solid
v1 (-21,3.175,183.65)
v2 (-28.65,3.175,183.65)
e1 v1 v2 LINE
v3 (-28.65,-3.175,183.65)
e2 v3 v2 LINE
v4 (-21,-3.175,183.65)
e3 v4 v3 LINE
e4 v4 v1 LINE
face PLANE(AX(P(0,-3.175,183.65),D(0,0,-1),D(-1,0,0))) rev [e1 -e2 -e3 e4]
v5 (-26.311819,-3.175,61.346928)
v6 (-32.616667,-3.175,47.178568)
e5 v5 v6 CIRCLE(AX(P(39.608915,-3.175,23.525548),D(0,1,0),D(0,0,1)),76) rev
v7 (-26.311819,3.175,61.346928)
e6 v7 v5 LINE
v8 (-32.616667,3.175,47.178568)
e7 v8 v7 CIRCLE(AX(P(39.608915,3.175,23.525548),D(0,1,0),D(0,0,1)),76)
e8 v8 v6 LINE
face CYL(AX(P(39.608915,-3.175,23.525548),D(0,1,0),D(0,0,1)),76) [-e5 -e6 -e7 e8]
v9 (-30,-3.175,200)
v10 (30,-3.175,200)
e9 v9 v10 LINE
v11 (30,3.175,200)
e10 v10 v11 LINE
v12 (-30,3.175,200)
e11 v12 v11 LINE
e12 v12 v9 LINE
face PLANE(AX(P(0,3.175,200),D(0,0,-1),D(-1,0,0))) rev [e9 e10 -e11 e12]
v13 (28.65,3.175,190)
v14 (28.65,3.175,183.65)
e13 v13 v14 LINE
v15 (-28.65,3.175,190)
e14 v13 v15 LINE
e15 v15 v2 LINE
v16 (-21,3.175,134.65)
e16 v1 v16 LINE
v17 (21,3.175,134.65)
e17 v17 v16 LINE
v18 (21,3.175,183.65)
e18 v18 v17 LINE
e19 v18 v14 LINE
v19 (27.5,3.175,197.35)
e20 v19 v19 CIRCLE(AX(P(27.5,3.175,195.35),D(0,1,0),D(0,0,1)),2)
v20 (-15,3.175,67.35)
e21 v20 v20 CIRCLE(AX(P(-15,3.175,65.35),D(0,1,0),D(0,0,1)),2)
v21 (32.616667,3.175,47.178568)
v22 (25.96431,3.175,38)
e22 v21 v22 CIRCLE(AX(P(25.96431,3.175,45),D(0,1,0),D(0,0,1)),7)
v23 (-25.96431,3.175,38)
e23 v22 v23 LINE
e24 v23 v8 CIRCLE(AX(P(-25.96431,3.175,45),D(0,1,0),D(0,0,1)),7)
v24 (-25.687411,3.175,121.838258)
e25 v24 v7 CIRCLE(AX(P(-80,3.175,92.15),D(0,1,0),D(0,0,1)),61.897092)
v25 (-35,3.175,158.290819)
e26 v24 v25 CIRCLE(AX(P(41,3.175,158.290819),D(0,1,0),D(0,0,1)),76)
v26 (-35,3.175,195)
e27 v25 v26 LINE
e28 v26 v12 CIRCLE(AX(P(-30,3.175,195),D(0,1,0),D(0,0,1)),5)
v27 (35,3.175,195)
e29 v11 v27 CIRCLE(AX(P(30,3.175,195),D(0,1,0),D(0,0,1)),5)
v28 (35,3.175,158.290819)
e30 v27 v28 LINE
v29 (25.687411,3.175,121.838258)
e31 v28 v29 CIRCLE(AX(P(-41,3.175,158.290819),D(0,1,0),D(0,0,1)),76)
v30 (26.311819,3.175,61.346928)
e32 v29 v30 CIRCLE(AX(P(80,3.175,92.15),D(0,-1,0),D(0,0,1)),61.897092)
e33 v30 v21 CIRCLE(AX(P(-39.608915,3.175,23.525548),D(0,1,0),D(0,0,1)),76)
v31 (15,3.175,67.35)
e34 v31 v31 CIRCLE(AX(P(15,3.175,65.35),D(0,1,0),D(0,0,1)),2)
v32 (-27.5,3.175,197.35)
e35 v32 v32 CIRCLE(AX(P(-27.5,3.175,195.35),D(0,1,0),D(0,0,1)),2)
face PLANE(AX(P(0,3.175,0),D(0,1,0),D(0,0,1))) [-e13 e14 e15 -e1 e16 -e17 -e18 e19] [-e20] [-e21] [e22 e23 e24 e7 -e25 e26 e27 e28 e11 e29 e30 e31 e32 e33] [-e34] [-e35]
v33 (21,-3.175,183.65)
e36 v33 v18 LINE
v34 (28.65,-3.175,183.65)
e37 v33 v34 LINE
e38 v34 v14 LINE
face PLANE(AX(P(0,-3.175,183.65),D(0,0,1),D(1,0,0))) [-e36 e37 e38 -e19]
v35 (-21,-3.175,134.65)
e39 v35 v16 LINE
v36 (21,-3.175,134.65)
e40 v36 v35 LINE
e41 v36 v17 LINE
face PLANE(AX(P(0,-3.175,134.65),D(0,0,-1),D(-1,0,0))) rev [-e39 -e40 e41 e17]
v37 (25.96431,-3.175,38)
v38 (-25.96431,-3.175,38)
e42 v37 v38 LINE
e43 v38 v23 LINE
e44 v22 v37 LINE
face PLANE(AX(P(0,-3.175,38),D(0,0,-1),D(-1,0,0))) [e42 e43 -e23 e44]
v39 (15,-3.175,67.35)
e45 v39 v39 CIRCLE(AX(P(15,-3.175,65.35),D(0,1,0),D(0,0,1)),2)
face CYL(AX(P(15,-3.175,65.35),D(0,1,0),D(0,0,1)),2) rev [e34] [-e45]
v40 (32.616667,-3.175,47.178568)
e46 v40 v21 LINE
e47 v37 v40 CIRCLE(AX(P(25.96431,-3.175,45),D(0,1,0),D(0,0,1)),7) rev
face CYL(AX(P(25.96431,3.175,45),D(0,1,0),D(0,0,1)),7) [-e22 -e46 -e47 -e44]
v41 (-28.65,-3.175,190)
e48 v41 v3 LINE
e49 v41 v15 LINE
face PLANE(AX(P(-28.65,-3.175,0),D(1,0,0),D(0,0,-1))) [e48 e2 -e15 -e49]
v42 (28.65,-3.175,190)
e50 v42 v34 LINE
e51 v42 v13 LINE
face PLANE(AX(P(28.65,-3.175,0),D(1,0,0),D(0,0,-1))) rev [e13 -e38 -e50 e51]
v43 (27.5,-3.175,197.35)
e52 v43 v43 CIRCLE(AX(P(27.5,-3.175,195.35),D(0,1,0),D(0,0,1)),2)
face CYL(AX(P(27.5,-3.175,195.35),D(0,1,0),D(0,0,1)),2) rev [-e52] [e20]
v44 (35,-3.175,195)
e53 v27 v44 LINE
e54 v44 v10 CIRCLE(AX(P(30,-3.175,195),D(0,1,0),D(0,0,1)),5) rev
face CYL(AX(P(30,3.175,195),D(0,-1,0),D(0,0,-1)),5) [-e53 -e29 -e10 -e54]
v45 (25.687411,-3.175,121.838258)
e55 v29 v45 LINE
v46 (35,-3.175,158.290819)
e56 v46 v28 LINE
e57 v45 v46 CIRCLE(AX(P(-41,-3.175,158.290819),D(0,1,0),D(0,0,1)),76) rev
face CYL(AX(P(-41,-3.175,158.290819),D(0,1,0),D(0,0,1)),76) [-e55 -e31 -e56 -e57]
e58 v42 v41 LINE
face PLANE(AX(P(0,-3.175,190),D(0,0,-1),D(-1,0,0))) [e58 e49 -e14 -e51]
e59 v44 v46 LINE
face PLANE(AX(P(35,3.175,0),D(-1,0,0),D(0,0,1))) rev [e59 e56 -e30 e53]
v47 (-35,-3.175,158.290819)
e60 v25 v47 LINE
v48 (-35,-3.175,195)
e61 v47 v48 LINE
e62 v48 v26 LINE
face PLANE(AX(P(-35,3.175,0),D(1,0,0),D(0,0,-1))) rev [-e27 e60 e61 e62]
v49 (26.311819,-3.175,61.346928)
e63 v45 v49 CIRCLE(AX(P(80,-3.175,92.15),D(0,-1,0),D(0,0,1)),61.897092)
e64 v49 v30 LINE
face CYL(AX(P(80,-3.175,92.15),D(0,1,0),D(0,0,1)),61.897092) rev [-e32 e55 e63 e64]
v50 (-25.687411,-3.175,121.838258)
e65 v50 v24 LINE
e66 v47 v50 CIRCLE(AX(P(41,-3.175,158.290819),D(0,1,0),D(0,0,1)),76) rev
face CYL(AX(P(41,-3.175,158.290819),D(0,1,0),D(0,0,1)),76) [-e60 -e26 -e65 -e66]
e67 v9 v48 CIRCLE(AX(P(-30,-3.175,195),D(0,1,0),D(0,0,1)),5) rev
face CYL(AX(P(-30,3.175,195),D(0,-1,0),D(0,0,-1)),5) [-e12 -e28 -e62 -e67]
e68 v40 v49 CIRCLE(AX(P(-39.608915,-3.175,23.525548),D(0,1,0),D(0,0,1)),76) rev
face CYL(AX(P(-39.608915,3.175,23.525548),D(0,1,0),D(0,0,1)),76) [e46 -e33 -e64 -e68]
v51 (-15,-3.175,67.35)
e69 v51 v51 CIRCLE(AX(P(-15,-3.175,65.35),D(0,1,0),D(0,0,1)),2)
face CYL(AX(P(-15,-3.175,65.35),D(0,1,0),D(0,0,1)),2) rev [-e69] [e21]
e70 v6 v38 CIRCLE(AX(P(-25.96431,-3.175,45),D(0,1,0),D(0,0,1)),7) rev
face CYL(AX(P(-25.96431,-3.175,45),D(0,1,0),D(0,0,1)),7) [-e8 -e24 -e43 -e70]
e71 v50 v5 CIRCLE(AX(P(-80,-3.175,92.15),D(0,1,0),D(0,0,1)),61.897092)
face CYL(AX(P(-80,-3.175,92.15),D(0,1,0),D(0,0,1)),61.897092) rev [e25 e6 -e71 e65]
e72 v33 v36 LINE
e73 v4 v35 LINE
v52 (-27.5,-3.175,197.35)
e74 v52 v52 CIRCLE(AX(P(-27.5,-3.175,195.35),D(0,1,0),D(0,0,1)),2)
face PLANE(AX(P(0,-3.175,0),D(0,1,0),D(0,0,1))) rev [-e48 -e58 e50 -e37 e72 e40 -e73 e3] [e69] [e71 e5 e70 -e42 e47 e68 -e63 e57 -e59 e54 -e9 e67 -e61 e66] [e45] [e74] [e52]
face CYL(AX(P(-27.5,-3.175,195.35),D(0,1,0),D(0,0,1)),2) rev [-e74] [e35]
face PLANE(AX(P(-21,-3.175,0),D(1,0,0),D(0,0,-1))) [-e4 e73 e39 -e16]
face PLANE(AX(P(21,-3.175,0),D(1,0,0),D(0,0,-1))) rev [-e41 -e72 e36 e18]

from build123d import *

# Parameters (mm, degrees)
BOSS_EXTRUDE1_DEPTH = 3.175
CUT_EXTRUDE1_DEPTH  = 204.138678001
SKETCH3_W           = 42
SKETCH3_H           = 55.35
SKETCH3_W_2         = 7.65
SKETCH3_H_2         = 6.35
CUT_EXTRUDE2_DEPTH  = 204.138678001
FILLET3_R           = 5
SKETCH5_R           = 2
CUT_EXTRUDE4_DEPTH  = 204.138678001
CUT_EXTRUDE5_DEPTH  = 204.138678001
FILLET5_R           = 76
FILLET6_R           = 7


with BuildPart() as part:
    # Sketch1 → Boss-Extrude1 (new, symmetric)
    with BuildSketch(Plane(origin=(0, 0, 0), x_dir=(1, 0, 0), z_dir=(0, 1, 0))):
        with BuildLine():
            Line((35, -200), (35, 0))
            ThreePointArc((35, 0), (0, 35), (-35, 0))
            Line((-35, 0), (-35, -200))
            Line((-35, -200), (35, -200))
        make_face()
    extrude(amount=BOSS_EXTRUDE1_DEPTH, both=True)

    # Sketch2 → Cut-Extrude1 (cut, through all)
    with BuildSketch(Plane(origin=(0, 3.175, 0), x_dir=(1, 0, 0), z_dir=(0, 1, 0))):
        with BuildLine():
            Line((-35, -38), (35, -38))
            Line((35, -38), (35, 0))
            ThreePointArc((35, 0), (0, 35), (-35, 0))
            Line((-35, 0), (-35, -38))
        make_face()
    extrude(amount=-CUT_EXTRUDE1_DEPTH, mode=Mode.SUBTRACT)

    # Sketch3 → Cut-Extrude2 (cut, through all)
    with BuildSketch(Plane(origin=(0, 3.175, 0), x_dir=(1, 0, 0), z_dir=(0, 1, 0))):
        with Locations((0, -162.325)):
            Rectangle(SKETCH3_W, SKETCH3_H)
        with Locations((-24.825, -186.825)):
            Rectangle(SKETCH3_W_2, SKETCH3_H_2)
        with Locations((24.825, -186.825)):
            Rectangle(SKETCH3_W_2, SKETCH3_H_2)
    extrude(amount=-CUT_EXTRUDE2_DEPTH, mode=Mode.SUBTRACT)

    # Fillet3
    fillet3_edges = [part.edges().sort_by_distance(p)[0] for p in [
        (35, 0, 200),
        (-35, 0, 200),
    ]]
    fillet(fillet3_edges, radius=FILLET3_R)

    # Sketch5 → Cut-Extrude4 (cut, through all)
    with BuildSketch(Plane(origin=(0, 3.175, 0), x_dir=(1, 0, 0), z_dir=(0, 1, 0))):
        with Locations(Location((27.5, -195.35, 0), (0, 0, 270))):
            Circle(SKETCH5_R)
        with Locations(Location((-27.5, -195.35, 0), (0, 0, 270))):
            Circle(SKETCH5_R)
        with Locations(Location((15, -65.35, 0), (0, 0, 270))):
            Circle(SKETCH5_R)
        with Locations(Location((-15, -65.35, 0), (0, 0, 270))):
            Circle(SKETCH5_R)
    extrude(amount=-CUT_EXTRUDE4_DEPTH, mode=Mode.SUBTRACT)

    # Sketch6 → Cut-Extrude5 (cut, through all)
    with BuildSketch(Plane(origin=(0, 3.175, 0), x_dir=(1, 0, 0), z_dir=(0, 1, 0))):
        with BuildLine():
            Line((-35, -134.65), (-35, -49.65))
            ThreePointArc((-35, -49.65), (-18.102907984, -92.15), (-35, -134.65))
        make_face()
    cut_extrude5 = extrude(amount=-CUT_EXTRUDE5_DEPTH, mode=Mode.SUBTRACT)

    # Mirror1: Cut-Extrude5 across plane
    add(cut_extrude5.mirror(Plane(origin=(0, 0, 0), x_dir=(0, 0, 1), z_dir=(1, 0, 0))), mode=Mode.SUBTRACT)

    # Fillet5
    # the kernel refuses this fillet: 76 mm, written as the material it takes off along each edge
    with BuildSketch(Plane(origin=(-35, 39.601520625, 49.65), x_dir=(0, 0, -1), z_dir=(0, -1, 0))) as fillet5_piece_1:
        with BuildLine():
            CenterArc((26.124451555, 74.608915367), FILLET5_R, 240.155370723, 18.865389254)
            Line((-11.696928446, 8.688181035), (-12.453356046, 7.369766348))
            ThreePointArc((-12.453356046, 7.369766348), (-6.498269887, 3.469254885), (-1.04366777, -1.105059992))
            Line((-1.04366777, -1.105059992), (0, -1.52))
            ThreePointArc((0, -1.52), (5.825, -1.52), (11.360510969, -1.492178307))
            Line((11.360510969, -1.492178307), (11.65, 0))
        make_face()
    extrude(amount=79.20304125, mode=Mode.SUBTRACT)
    with BuildSketch(Plane(origin=(-35, 62.277048415, 134.65), x_dir=(0.587963491001448, 0, -0.8088874663693276), z_dir=(0, -1, 0))) as fillet5_piece_2:
        with BuildLine():
            CenterArc((25.562462836, 75.375386129), FILLET5_R, 233.987375861, 28.66182532)
            Line((-19.12276248, 13.899938684), (-20.016466986, 12.670429736))
            Line((-20.016466986, 12.670429736), (-0.893704506, -1.229508949))
            Line((-0.893704506, -1.229508949), (0.194474848, -1.507507723))
            ThreePointArc((0.194474848, -1.507507723), (7.919360226, -1.011292338), (15.644245604, -1.507507723))
            Line((15.644245604, -1.507507723), (15.838720451, 0))
        make_face()
    extrude(amount=124.554096829, mode=Mode.SUBTRACT)
    with BuildSketch(Plane(origin=(35, 62.277048415, 134.65), x_dir=(-0.587963491001448, 0, -0.8088874663693276), z_dir=(0, -1, 0))) as fillet5_piece_3:
        with BuildLine():
            CenterArc((25.562462836, -75.375386129), FILLET5_R, 97.350798819, 28.66182532)
            Line((-19.12276248, -13.899938684), (-20.016466986, -12.670429736))
            Line((-20.016466986, -12.670429736), (-0.893704506, 1.229508949))
            Line((-0.893704506, 1.229508949), (0.194474848, 1.507507723))
            ThreePointArc((0.194474848, 1.507507723), (7.919360226, 1.011292338), (15.644245604, 1.507507723))
            Line((15.644245604, 1.507507723), (15.838720451, 0))
        make_face()
    extrude(amount=124.554096829, mode=Mode.SUBTRACT)
    with BuildSketch(Plane(origin=(35, 39.601520625, 49.65), x_dir=(0, 0, -1), z_dir=(0, -1, 0))) as fillet5_piece_4:
        with BuildLine():
            CenterArc((26.124451555, -74.608915367), FILLET5_R, 100.979240023, 18.865389254)
            Line((-11.696928446, -8.688181035), (-12.453356046, -7.369766348))
            ThreePointArc((-12.453356046, -7.369766348), (-6.498269887, -3.469254885), (-1.04366777, 1.105059992))
            Line((-1.04366777, 1.105059992), (0, 1.52))
            ThreePointArc((0, 1.52), (5.825, 1.52), (11.360510969, 1.492178307))
            Line((11.360510969, 1.492178307), (11.65, 0))
        make_face()
    extrude(amount=79.20304125, mode=Mode.SUBTRACT)

    # Fillet6
    fillet6_edges = [part.edges().sort_by_distance(p)[0] for p in [
        (35, 0, 38),
        (-35, 0, 38),
    ]]
    fillet(fillet6_edges, radius=FILLET6_R)


solid = part.part
